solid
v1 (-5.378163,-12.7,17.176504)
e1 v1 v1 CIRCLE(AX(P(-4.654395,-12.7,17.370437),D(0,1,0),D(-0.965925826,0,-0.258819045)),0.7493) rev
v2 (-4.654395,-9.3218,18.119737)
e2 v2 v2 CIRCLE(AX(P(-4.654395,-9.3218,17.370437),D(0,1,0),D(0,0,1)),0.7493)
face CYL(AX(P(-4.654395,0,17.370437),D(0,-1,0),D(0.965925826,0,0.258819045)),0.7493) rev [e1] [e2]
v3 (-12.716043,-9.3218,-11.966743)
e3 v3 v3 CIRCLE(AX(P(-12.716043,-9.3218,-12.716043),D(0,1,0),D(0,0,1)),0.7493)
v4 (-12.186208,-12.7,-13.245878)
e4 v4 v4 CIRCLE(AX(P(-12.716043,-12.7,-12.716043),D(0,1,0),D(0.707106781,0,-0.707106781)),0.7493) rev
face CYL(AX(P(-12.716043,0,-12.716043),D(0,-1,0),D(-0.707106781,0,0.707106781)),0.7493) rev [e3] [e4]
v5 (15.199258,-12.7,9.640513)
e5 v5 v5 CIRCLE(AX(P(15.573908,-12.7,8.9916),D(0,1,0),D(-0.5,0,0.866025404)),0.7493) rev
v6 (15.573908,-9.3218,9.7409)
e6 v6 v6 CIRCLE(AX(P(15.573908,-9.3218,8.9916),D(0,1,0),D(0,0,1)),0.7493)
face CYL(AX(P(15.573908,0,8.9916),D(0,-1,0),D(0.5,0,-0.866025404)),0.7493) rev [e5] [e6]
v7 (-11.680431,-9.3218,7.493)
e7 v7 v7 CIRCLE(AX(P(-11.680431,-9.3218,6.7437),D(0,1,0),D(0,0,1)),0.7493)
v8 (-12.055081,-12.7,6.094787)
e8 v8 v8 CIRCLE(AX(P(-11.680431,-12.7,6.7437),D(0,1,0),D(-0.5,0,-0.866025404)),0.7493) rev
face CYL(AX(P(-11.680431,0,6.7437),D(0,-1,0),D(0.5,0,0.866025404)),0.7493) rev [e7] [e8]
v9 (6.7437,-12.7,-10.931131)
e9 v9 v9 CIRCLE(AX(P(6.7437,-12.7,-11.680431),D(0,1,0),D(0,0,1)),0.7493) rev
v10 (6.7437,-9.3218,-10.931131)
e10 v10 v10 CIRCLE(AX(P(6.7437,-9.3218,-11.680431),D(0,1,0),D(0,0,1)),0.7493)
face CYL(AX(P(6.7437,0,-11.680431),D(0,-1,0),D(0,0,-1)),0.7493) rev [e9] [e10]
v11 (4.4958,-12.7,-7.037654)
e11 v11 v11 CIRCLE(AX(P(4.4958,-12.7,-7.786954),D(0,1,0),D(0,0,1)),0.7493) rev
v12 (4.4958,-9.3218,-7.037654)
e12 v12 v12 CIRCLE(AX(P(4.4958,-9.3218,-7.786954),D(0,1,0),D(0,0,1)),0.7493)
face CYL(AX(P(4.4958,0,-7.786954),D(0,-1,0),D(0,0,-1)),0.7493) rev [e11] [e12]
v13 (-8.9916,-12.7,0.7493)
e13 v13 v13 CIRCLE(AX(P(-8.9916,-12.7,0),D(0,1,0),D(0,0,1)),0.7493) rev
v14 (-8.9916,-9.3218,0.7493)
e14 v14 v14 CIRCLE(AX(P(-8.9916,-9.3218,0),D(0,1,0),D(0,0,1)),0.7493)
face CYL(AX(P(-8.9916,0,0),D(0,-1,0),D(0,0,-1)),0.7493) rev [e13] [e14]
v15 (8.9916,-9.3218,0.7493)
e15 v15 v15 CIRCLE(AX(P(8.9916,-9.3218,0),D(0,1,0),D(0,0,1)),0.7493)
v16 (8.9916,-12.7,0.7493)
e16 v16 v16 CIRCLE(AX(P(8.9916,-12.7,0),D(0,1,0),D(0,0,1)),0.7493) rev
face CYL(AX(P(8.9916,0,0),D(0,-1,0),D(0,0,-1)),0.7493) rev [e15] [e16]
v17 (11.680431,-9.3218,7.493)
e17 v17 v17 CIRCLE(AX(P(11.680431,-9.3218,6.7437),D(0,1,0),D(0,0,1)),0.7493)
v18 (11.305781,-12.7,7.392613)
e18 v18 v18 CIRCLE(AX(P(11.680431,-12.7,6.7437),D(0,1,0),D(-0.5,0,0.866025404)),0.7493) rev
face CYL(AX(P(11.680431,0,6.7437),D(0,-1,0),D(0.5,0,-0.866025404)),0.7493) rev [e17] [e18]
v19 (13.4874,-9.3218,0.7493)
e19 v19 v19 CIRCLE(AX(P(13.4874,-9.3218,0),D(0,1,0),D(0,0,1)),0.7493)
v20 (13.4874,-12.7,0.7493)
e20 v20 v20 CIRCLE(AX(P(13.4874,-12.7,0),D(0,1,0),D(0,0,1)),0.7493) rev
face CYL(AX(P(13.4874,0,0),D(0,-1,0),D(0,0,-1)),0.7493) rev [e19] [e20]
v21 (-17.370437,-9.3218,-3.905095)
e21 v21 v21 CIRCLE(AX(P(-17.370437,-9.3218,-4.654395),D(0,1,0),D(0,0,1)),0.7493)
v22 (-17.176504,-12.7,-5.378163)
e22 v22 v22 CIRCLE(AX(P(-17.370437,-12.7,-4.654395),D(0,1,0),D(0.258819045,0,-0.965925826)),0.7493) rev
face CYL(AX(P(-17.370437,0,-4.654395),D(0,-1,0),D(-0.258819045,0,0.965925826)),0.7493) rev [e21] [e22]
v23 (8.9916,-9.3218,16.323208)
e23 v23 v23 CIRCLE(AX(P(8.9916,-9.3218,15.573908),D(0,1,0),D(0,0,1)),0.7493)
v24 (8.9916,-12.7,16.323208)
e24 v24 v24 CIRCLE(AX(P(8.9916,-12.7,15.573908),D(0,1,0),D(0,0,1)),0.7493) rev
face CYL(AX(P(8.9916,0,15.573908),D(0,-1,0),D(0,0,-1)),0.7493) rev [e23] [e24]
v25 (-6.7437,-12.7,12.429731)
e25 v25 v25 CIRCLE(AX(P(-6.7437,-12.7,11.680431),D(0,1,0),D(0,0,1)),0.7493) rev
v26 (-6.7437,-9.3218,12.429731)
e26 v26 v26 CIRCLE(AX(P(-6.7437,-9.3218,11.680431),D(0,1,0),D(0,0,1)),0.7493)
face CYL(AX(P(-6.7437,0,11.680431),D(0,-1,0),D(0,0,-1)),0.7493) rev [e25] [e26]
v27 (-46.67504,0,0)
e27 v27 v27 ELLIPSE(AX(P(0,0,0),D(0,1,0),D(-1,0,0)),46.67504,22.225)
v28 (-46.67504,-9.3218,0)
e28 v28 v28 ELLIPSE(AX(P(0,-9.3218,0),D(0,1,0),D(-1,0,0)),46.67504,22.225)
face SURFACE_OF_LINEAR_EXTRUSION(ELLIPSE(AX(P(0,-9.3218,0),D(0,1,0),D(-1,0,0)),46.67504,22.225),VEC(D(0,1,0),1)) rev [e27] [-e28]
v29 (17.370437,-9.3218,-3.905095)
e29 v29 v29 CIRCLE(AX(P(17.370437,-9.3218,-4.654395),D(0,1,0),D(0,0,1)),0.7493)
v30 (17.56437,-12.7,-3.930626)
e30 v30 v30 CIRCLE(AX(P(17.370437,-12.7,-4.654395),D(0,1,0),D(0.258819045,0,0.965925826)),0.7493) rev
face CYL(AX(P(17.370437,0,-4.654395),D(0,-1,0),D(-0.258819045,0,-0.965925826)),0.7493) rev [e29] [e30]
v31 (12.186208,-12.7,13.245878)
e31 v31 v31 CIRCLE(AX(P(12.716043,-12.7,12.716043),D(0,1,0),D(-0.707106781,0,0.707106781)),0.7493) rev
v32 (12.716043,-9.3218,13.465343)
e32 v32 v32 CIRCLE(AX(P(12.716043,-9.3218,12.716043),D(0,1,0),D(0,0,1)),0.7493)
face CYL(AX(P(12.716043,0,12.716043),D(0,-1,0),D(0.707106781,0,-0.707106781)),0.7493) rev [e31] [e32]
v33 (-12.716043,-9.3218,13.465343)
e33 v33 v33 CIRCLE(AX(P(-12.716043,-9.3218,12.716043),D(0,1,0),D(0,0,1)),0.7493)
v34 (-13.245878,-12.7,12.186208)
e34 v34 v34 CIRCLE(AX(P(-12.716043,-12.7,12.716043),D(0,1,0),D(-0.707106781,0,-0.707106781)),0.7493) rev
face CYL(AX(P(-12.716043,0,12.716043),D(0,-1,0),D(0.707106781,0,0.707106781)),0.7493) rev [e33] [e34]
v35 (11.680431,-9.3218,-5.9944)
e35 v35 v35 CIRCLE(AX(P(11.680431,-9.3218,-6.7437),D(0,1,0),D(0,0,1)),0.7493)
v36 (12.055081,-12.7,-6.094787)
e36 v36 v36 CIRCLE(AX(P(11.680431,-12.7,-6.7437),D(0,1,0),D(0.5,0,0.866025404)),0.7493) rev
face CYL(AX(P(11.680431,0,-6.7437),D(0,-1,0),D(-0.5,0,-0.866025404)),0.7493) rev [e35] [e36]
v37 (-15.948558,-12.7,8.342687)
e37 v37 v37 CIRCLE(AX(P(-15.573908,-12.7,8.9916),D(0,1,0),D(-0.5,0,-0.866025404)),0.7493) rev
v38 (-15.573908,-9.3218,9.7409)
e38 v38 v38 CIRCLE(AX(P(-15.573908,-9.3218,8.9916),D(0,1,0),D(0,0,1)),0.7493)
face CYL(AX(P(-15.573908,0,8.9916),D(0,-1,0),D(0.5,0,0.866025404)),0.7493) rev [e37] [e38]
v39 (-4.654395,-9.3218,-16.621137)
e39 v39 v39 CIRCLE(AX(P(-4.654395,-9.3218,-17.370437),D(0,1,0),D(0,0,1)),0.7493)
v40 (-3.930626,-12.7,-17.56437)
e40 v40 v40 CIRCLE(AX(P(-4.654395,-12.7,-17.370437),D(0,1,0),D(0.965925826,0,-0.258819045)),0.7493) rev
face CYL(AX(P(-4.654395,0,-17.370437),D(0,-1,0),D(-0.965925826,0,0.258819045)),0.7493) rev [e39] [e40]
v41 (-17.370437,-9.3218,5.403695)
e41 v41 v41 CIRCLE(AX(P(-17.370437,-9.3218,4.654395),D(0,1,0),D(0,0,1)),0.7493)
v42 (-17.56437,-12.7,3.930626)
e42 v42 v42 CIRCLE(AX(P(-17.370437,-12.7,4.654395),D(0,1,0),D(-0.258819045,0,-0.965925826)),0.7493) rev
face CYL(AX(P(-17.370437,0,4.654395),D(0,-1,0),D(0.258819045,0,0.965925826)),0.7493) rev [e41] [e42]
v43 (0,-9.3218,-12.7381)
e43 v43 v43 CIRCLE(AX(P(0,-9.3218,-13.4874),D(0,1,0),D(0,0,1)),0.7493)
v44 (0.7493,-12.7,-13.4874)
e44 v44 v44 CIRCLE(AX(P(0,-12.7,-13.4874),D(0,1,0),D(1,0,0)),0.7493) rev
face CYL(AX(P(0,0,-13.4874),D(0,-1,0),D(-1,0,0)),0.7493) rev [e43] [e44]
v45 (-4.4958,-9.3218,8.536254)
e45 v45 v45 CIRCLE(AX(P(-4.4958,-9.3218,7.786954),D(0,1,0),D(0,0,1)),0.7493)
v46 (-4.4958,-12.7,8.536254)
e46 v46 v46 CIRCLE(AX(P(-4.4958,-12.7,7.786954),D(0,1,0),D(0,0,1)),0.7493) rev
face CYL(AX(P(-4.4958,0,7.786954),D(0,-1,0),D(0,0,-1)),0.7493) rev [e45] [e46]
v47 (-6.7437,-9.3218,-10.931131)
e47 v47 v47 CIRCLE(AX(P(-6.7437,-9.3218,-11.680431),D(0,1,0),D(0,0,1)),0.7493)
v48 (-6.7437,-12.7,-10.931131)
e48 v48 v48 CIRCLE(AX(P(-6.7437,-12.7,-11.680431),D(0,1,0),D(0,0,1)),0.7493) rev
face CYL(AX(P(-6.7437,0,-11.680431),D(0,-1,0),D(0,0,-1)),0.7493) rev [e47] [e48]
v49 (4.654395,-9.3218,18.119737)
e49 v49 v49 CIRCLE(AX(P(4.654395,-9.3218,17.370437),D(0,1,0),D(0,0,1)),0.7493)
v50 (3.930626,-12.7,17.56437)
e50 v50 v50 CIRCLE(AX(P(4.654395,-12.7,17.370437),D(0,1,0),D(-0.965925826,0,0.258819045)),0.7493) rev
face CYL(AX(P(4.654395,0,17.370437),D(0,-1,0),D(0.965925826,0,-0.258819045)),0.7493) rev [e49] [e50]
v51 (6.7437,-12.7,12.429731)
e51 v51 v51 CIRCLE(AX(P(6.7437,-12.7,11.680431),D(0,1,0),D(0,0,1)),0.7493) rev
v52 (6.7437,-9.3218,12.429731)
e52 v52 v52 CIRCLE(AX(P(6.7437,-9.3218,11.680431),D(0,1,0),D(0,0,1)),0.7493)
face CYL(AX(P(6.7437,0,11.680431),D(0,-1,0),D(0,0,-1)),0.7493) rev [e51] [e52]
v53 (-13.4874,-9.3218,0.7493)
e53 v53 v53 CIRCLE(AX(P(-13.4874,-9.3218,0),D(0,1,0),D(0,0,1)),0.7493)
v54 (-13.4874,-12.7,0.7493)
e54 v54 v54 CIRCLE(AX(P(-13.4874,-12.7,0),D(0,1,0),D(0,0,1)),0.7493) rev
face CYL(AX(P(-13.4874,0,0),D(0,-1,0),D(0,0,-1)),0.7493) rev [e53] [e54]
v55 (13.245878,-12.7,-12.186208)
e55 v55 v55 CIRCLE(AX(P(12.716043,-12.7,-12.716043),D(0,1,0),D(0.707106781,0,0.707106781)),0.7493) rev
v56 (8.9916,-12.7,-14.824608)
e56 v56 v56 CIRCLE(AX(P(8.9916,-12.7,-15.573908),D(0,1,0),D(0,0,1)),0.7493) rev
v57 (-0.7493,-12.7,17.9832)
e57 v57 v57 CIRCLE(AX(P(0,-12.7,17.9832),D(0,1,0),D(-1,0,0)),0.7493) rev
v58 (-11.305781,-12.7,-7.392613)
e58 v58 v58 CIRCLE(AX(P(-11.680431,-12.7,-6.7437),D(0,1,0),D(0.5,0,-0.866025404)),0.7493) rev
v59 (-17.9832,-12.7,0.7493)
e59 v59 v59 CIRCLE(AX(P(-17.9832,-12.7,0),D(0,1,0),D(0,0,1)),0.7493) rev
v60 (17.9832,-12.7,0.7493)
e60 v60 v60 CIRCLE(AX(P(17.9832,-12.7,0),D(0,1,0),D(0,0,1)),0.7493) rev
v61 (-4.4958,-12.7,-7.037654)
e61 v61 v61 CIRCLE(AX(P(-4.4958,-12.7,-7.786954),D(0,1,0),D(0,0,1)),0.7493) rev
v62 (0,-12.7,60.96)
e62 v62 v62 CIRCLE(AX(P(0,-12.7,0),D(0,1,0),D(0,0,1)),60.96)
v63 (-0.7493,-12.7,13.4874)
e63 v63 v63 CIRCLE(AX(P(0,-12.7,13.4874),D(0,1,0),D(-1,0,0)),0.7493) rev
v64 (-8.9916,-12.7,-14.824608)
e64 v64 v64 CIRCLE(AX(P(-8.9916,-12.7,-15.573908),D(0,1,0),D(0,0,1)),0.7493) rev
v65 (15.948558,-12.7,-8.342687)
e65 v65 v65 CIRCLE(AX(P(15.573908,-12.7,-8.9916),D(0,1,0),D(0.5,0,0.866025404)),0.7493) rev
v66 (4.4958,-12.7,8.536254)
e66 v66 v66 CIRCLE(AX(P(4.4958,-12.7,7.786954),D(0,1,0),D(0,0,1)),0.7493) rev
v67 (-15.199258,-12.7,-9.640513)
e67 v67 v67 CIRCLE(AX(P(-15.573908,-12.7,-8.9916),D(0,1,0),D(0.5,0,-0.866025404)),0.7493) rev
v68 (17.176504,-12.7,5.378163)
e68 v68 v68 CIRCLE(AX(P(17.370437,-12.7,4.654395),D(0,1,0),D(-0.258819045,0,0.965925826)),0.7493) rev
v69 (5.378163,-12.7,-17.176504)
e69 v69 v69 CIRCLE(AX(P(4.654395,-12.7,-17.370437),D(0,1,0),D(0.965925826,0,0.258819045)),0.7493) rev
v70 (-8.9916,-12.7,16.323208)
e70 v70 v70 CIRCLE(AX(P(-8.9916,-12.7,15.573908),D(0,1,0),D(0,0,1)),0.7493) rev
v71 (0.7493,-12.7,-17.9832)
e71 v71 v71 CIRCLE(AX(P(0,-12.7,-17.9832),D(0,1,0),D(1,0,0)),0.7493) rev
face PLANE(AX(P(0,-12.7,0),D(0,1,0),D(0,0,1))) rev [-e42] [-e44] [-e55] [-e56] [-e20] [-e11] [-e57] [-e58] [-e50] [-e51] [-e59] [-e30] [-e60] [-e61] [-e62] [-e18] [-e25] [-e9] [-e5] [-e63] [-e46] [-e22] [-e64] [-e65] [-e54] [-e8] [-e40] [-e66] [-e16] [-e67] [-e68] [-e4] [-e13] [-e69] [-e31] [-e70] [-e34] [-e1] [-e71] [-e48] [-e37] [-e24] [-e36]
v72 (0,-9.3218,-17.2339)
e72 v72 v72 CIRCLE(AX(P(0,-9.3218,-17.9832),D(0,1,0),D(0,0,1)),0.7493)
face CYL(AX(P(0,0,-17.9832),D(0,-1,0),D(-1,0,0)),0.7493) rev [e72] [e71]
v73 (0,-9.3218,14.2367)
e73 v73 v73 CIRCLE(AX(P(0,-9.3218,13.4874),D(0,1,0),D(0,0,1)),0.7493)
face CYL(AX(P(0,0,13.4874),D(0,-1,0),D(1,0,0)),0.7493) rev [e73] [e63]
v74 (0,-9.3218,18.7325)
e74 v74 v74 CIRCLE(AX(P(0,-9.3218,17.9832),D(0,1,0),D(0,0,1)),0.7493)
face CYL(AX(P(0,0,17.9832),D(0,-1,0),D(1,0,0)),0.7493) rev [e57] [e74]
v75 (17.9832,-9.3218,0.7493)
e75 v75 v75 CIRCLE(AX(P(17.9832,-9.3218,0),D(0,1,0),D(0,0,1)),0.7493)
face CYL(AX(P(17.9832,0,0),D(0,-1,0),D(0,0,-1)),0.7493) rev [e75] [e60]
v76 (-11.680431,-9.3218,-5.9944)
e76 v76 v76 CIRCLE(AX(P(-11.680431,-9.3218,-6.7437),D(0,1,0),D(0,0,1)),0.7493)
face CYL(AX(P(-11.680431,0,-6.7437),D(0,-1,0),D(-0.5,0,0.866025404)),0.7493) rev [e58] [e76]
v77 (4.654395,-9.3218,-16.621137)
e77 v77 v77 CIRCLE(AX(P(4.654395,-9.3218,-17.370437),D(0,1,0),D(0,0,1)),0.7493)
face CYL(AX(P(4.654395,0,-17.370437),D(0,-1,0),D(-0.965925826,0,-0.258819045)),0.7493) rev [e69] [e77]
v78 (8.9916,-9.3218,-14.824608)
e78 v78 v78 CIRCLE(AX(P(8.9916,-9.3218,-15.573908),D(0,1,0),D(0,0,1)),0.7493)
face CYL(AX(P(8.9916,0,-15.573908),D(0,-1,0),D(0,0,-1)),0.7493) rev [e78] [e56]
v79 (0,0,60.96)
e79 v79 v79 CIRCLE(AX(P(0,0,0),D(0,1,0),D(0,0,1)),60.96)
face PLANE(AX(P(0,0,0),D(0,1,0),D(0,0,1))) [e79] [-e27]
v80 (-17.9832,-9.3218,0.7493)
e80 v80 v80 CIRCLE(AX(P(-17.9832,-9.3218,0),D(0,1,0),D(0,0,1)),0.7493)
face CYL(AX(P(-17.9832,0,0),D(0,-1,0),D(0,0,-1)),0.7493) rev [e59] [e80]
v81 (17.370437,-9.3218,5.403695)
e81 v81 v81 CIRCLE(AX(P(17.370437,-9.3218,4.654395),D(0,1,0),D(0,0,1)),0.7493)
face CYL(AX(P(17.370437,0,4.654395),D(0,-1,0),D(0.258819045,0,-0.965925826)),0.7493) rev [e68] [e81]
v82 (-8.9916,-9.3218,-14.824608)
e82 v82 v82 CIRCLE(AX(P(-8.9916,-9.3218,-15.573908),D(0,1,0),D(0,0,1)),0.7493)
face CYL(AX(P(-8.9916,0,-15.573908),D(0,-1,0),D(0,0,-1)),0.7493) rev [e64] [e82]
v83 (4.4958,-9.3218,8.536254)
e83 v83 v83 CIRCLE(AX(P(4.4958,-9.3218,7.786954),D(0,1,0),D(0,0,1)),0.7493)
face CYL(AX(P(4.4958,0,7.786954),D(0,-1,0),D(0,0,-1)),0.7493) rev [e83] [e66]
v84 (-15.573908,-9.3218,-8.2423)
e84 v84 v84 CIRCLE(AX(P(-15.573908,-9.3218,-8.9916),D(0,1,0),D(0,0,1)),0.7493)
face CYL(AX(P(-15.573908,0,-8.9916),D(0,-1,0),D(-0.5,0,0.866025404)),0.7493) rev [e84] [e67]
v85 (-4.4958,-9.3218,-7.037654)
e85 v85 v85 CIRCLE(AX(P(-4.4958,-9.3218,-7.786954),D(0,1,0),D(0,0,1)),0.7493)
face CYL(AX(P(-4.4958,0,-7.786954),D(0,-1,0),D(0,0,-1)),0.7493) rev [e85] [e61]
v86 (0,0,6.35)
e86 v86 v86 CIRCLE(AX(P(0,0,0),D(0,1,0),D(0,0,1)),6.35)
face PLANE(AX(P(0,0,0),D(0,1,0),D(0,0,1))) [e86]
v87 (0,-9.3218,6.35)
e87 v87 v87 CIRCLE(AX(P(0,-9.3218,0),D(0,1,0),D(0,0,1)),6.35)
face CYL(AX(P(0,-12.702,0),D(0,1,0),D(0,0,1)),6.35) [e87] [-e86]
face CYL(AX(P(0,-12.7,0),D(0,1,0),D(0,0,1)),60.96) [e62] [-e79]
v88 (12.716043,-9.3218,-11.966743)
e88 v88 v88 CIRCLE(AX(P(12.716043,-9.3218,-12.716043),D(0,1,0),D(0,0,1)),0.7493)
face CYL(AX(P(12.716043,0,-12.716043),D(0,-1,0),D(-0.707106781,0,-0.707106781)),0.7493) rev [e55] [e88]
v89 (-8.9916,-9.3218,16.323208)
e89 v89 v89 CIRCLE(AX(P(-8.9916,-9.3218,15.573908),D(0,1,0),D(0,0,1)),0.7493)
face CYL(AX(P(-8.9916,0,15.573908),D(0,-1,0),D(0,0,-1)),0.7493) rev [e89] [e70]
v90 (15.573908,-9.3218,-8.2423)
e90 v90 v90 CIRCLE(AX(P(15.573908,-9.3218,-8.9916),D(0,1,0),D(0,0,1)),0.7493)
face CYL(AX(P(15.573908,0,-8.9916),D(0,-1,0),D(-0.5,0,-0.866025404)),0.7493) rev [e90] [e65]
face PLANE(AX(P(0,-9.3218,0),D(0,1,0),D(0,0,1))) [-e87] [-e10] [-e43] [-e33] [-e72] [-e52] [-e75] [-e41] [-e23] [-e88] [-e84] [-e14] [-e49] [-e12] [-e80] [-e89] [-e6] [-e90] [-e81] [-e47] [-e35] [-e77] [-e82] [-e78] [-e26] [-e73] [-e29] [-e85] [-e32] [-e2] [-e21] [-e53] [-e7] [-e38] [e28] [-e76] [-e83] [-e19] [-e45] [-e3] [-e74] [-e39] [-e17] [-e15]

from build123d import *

# Parameters (mm, degrees)
SKETCH1_R                       = 60.96
BILLET_DEPTH                    = 12.7
SKETCH4_R                       = 0.7493
FIRST_KEROSENE_OUTLET_DEPTH     = 88.140881336
PRIMARY_HOLES_COUNT             = 6
SECOND_START                    = -12.7
SECOND_RING_OUTLINE_R           = 0.7493
SECOND_RING_DEPTH               = 12.7
THIRD_START                     = -12.7
THIRD_RING_OUTLINE_R            = 0.7493
THIRD_RING_DEPTH                = 12.7
SKETCH18_RX                     = 46.67504
SKETCH18_RY                     = 22.225
KEROSENE_WELL_DEPTH             = 9.3218
SKETCH17_R                      = 6.35
BOSS_EXTRUDE1_DEPTH             = 2.54
BOSS_EXTRUDE1_DIRECTION_2_REACH = 89.141
SKETCH21_R                      = 6.35
CUT_EXTRUDE1_DEPTH              = 2.54


# Read off the part's stored shape, not the designer's step: Second ring, Third Ring
with BuildPart() as part:
    # Sketch1 → Billet (new body)
    with BuildSketch(Plane(origin=(0, 0, 0), x_dir=(1, 0, 0), z_dir=(0, 1, 0))):
        with Locations(Location((0, 0, 0), (0, 0, 270))):
            Circle(SKETCH1_R)
    extrude(amount=-BILLET_DEPTH)

    # Sketch4 → First Kerosene Outlet (cut, symmetric)
    with BuildSketch(Plane(origin=(0, -12.7, 0), x_dir=(1, 0, 0), z_dir=(0, 1, 0))):
        with Locations(Location((8.9916, 0, 0), (0, 0, 270))):
            Circle(SKETCH4_R)
        with Locations(Location((13.4874, 0, 0), (0, 0, 270))):
            Circle(SKETCH4_R)
        with Locations(Location((17.9832, 0, 0), (0, 0, 270))):
            Circle(SKETCH4_R)
    first_kerosene_outlet = extrude(amount=FIRST_KEROSENE_OUTLET_DEPTH, both=True, mode=Mode.SUBTRACT)

    # Primary Holes: First Kerosene Outlet ×6 about axis
    primary_holes_axis = Axis((0, 0, 0), (0, 1, 0))
    for i in range(1, PRIMARY_HOLES_COUNT):
        add(first_kerosene_outlet.rotate(primary_holes_axis, i * 360 / PRIMARY_HOLES_COUNT), mode=Mode.SUBTRACT)

    # Second ring outline → Second ring (cut)
    with BuildSketch(Plane(origin=(0, 0, 0), x_dir=(1, 0, 0), z_dir=(0, 1, 0)).offset(SECOND_START)):
        with Locations((11.680431031, 6.7437)):
            Circle(SECOND_RING_OUTLINE_R)
        with Locations((0, 13.4874)):
            Circle(SECOND_RING_OUTLINE_R)
        with Locations((-11.680431031, 6.7437)):
            Circle(SECOND_RING_OUTLINE_R)
        with Locations((-11.680431031, -6.7437)):
            Circle(SECOND_RING_OUTLINE_R)
        with Locations((0, -13.4874)):
            Circle(SECOND_RING_OUTLINE_R)
        with Locations((11.680431031, -6.7437)):
            Circle(SECOND_RING_OUTLINE_R)
    extrude(amount=SECOND_RING_DEPTH, mode=Mode.SUBTRACT)

    # Third Ring outline → Third Ring (cut)
    with BuildSketch(Plane(origin=(0, 0, 0), x_dir=(1, 0, 0), z_dir=(0, 1, 0)).offset(THIRD_START)):
        with Locations((17.370437319, 4.654394652)):
            Circle(THIRD_RING_OUTLINE_R)
        with Locations((15.573908041, 8.9916)):
            Circle(THIRD_RING_OUTLINE_R)
        with Locations((12.716042667, 12.716042667)):
            Circle(THIRD_RING_OUTLINE_R)
        with Locations((4.654394652, 17.370437319)):
            Circle(THIRD_RING_OUTLINE_R)
        with Locations((0, 17.9832)):
            Circle(THIRD_RING_OUTLINE_R)
        with Locations((-4.654394652, 17.370437319)):
            Circle(THIRD_RING_OUTLINE_R)
        with Locations((-12.716042667, 12.716042667)):
            Circle(THIRD_RING_OUTLINE_R)
        with Locations((-15.573908041, 8.9916)):
            Circle(THIRD_RING_OUTLINE_R)
        with Locations((-17.370437319, 4.654394652)):
            Circle(THIRD_RING_OUTLINE_R)
        with Locations((-17.370437319, -4.654394652)):
            Circle(THIRD_RING_OUTLINE_R)
        with Locations((-15.573908041, -8.9916)):
            Circle(THIRD_RING_OUTLINE_R)
        with Locations((-12.716042667, -12.716042667)):
            Circle(THIRD_RING_OUTLINE_R)
        with Locations((-4.654394652, -17.370437319)):
            Circle(THIRD_RING_OUTLINE_R)
        with Locations((0, -17.9832)):
            Circle(THIRD_RING_OUTLINE_R)
        with Locations((4.654394652, -17.370437319)):
            Circle(THIRD_RING_OUTLINE_R)
        with Locations((12.716042667, -12.716042667)):
            Circle(THIRD_RING_OUTLINE_R)
        with Locations((15.573908041, -8.9916)):
            Circle(THIRD_RING_OUTLINE_R)
        with Locations((17.370437319, -4.654394652)):
            Circle(THIRD_RING_OUTLINE_R)
    extrude(amount=THIRD_RING_DEPTH, mode=Mode.SUBTRACT)

    # Sketch18 → Kerosene Well (cut)
    with BuildSketch(Plane(origin=(0, 0, 0), x_dir=(1, 0, 0), z_dir=(0, 1, 0))):
        with Locations(Location((0, 0), (0, 0, -180))):
            Ellipse(SKETCH18_RX, SKETCH18_RY)
    extrude(amount=-KEROSENE_WELL_DEPTH, mode=Mode.SUBTRACT)

    # Sketch17 → Boss-Extrude1 (add)
    with BuildSketch(Plane(origin=(0, 0, 0), x_dir=(1, 0, 0), z_dir=(0, 1, 0))):
        with Locations(Location((0, 0, 0), (0, 0, 270))):
            Circle(SKETCH17_R)
    extrude(amount=BOSS_EXTRUDE1_DEPTH)

    # Sketch17 → Boss-Extrude1 direction 2 (add, up to next)
    with BuildSketch(Plane(origin=(0, 0, 0), x_dir=(1, 0, 0), z_dir=(0, 1, 0)), mode=Mode.PRIVATE) as boss_extrude1_direction_2_sk1:
        with Locations(Location((0, 0, 0), (0, 0, 270))):
            Circle(SKETCH17_R)
    boss_extrude1_direction_2_tool1 = extrude(boss_extrude1_direction_2_sk1.sketch, amount=-BOSS_EXTRUDE1_DIRECTION_2_REACH, mode=Mode.PRIVATE) - part.part
    add(boss_extrude1_direction_2_tool1.solids().sort_by_distance((0, 0, 0))[0])

    # Sketch21 → Cut-Extrude1 (cut)
    with BuildSketch(Plane(origin=(0, 2.54, 0), x_dir=(1, 0, 0), z_dir=(0, 1, 0))):
        with Locations(Location((0, 0, 0), (0, 0, 270))):
            Circle(SKETCH21_R)
    extrude(amount=-CUT_EXTRUDE1_DEPTH, mode=Mode.SUBTRACT)


solid = part.part
